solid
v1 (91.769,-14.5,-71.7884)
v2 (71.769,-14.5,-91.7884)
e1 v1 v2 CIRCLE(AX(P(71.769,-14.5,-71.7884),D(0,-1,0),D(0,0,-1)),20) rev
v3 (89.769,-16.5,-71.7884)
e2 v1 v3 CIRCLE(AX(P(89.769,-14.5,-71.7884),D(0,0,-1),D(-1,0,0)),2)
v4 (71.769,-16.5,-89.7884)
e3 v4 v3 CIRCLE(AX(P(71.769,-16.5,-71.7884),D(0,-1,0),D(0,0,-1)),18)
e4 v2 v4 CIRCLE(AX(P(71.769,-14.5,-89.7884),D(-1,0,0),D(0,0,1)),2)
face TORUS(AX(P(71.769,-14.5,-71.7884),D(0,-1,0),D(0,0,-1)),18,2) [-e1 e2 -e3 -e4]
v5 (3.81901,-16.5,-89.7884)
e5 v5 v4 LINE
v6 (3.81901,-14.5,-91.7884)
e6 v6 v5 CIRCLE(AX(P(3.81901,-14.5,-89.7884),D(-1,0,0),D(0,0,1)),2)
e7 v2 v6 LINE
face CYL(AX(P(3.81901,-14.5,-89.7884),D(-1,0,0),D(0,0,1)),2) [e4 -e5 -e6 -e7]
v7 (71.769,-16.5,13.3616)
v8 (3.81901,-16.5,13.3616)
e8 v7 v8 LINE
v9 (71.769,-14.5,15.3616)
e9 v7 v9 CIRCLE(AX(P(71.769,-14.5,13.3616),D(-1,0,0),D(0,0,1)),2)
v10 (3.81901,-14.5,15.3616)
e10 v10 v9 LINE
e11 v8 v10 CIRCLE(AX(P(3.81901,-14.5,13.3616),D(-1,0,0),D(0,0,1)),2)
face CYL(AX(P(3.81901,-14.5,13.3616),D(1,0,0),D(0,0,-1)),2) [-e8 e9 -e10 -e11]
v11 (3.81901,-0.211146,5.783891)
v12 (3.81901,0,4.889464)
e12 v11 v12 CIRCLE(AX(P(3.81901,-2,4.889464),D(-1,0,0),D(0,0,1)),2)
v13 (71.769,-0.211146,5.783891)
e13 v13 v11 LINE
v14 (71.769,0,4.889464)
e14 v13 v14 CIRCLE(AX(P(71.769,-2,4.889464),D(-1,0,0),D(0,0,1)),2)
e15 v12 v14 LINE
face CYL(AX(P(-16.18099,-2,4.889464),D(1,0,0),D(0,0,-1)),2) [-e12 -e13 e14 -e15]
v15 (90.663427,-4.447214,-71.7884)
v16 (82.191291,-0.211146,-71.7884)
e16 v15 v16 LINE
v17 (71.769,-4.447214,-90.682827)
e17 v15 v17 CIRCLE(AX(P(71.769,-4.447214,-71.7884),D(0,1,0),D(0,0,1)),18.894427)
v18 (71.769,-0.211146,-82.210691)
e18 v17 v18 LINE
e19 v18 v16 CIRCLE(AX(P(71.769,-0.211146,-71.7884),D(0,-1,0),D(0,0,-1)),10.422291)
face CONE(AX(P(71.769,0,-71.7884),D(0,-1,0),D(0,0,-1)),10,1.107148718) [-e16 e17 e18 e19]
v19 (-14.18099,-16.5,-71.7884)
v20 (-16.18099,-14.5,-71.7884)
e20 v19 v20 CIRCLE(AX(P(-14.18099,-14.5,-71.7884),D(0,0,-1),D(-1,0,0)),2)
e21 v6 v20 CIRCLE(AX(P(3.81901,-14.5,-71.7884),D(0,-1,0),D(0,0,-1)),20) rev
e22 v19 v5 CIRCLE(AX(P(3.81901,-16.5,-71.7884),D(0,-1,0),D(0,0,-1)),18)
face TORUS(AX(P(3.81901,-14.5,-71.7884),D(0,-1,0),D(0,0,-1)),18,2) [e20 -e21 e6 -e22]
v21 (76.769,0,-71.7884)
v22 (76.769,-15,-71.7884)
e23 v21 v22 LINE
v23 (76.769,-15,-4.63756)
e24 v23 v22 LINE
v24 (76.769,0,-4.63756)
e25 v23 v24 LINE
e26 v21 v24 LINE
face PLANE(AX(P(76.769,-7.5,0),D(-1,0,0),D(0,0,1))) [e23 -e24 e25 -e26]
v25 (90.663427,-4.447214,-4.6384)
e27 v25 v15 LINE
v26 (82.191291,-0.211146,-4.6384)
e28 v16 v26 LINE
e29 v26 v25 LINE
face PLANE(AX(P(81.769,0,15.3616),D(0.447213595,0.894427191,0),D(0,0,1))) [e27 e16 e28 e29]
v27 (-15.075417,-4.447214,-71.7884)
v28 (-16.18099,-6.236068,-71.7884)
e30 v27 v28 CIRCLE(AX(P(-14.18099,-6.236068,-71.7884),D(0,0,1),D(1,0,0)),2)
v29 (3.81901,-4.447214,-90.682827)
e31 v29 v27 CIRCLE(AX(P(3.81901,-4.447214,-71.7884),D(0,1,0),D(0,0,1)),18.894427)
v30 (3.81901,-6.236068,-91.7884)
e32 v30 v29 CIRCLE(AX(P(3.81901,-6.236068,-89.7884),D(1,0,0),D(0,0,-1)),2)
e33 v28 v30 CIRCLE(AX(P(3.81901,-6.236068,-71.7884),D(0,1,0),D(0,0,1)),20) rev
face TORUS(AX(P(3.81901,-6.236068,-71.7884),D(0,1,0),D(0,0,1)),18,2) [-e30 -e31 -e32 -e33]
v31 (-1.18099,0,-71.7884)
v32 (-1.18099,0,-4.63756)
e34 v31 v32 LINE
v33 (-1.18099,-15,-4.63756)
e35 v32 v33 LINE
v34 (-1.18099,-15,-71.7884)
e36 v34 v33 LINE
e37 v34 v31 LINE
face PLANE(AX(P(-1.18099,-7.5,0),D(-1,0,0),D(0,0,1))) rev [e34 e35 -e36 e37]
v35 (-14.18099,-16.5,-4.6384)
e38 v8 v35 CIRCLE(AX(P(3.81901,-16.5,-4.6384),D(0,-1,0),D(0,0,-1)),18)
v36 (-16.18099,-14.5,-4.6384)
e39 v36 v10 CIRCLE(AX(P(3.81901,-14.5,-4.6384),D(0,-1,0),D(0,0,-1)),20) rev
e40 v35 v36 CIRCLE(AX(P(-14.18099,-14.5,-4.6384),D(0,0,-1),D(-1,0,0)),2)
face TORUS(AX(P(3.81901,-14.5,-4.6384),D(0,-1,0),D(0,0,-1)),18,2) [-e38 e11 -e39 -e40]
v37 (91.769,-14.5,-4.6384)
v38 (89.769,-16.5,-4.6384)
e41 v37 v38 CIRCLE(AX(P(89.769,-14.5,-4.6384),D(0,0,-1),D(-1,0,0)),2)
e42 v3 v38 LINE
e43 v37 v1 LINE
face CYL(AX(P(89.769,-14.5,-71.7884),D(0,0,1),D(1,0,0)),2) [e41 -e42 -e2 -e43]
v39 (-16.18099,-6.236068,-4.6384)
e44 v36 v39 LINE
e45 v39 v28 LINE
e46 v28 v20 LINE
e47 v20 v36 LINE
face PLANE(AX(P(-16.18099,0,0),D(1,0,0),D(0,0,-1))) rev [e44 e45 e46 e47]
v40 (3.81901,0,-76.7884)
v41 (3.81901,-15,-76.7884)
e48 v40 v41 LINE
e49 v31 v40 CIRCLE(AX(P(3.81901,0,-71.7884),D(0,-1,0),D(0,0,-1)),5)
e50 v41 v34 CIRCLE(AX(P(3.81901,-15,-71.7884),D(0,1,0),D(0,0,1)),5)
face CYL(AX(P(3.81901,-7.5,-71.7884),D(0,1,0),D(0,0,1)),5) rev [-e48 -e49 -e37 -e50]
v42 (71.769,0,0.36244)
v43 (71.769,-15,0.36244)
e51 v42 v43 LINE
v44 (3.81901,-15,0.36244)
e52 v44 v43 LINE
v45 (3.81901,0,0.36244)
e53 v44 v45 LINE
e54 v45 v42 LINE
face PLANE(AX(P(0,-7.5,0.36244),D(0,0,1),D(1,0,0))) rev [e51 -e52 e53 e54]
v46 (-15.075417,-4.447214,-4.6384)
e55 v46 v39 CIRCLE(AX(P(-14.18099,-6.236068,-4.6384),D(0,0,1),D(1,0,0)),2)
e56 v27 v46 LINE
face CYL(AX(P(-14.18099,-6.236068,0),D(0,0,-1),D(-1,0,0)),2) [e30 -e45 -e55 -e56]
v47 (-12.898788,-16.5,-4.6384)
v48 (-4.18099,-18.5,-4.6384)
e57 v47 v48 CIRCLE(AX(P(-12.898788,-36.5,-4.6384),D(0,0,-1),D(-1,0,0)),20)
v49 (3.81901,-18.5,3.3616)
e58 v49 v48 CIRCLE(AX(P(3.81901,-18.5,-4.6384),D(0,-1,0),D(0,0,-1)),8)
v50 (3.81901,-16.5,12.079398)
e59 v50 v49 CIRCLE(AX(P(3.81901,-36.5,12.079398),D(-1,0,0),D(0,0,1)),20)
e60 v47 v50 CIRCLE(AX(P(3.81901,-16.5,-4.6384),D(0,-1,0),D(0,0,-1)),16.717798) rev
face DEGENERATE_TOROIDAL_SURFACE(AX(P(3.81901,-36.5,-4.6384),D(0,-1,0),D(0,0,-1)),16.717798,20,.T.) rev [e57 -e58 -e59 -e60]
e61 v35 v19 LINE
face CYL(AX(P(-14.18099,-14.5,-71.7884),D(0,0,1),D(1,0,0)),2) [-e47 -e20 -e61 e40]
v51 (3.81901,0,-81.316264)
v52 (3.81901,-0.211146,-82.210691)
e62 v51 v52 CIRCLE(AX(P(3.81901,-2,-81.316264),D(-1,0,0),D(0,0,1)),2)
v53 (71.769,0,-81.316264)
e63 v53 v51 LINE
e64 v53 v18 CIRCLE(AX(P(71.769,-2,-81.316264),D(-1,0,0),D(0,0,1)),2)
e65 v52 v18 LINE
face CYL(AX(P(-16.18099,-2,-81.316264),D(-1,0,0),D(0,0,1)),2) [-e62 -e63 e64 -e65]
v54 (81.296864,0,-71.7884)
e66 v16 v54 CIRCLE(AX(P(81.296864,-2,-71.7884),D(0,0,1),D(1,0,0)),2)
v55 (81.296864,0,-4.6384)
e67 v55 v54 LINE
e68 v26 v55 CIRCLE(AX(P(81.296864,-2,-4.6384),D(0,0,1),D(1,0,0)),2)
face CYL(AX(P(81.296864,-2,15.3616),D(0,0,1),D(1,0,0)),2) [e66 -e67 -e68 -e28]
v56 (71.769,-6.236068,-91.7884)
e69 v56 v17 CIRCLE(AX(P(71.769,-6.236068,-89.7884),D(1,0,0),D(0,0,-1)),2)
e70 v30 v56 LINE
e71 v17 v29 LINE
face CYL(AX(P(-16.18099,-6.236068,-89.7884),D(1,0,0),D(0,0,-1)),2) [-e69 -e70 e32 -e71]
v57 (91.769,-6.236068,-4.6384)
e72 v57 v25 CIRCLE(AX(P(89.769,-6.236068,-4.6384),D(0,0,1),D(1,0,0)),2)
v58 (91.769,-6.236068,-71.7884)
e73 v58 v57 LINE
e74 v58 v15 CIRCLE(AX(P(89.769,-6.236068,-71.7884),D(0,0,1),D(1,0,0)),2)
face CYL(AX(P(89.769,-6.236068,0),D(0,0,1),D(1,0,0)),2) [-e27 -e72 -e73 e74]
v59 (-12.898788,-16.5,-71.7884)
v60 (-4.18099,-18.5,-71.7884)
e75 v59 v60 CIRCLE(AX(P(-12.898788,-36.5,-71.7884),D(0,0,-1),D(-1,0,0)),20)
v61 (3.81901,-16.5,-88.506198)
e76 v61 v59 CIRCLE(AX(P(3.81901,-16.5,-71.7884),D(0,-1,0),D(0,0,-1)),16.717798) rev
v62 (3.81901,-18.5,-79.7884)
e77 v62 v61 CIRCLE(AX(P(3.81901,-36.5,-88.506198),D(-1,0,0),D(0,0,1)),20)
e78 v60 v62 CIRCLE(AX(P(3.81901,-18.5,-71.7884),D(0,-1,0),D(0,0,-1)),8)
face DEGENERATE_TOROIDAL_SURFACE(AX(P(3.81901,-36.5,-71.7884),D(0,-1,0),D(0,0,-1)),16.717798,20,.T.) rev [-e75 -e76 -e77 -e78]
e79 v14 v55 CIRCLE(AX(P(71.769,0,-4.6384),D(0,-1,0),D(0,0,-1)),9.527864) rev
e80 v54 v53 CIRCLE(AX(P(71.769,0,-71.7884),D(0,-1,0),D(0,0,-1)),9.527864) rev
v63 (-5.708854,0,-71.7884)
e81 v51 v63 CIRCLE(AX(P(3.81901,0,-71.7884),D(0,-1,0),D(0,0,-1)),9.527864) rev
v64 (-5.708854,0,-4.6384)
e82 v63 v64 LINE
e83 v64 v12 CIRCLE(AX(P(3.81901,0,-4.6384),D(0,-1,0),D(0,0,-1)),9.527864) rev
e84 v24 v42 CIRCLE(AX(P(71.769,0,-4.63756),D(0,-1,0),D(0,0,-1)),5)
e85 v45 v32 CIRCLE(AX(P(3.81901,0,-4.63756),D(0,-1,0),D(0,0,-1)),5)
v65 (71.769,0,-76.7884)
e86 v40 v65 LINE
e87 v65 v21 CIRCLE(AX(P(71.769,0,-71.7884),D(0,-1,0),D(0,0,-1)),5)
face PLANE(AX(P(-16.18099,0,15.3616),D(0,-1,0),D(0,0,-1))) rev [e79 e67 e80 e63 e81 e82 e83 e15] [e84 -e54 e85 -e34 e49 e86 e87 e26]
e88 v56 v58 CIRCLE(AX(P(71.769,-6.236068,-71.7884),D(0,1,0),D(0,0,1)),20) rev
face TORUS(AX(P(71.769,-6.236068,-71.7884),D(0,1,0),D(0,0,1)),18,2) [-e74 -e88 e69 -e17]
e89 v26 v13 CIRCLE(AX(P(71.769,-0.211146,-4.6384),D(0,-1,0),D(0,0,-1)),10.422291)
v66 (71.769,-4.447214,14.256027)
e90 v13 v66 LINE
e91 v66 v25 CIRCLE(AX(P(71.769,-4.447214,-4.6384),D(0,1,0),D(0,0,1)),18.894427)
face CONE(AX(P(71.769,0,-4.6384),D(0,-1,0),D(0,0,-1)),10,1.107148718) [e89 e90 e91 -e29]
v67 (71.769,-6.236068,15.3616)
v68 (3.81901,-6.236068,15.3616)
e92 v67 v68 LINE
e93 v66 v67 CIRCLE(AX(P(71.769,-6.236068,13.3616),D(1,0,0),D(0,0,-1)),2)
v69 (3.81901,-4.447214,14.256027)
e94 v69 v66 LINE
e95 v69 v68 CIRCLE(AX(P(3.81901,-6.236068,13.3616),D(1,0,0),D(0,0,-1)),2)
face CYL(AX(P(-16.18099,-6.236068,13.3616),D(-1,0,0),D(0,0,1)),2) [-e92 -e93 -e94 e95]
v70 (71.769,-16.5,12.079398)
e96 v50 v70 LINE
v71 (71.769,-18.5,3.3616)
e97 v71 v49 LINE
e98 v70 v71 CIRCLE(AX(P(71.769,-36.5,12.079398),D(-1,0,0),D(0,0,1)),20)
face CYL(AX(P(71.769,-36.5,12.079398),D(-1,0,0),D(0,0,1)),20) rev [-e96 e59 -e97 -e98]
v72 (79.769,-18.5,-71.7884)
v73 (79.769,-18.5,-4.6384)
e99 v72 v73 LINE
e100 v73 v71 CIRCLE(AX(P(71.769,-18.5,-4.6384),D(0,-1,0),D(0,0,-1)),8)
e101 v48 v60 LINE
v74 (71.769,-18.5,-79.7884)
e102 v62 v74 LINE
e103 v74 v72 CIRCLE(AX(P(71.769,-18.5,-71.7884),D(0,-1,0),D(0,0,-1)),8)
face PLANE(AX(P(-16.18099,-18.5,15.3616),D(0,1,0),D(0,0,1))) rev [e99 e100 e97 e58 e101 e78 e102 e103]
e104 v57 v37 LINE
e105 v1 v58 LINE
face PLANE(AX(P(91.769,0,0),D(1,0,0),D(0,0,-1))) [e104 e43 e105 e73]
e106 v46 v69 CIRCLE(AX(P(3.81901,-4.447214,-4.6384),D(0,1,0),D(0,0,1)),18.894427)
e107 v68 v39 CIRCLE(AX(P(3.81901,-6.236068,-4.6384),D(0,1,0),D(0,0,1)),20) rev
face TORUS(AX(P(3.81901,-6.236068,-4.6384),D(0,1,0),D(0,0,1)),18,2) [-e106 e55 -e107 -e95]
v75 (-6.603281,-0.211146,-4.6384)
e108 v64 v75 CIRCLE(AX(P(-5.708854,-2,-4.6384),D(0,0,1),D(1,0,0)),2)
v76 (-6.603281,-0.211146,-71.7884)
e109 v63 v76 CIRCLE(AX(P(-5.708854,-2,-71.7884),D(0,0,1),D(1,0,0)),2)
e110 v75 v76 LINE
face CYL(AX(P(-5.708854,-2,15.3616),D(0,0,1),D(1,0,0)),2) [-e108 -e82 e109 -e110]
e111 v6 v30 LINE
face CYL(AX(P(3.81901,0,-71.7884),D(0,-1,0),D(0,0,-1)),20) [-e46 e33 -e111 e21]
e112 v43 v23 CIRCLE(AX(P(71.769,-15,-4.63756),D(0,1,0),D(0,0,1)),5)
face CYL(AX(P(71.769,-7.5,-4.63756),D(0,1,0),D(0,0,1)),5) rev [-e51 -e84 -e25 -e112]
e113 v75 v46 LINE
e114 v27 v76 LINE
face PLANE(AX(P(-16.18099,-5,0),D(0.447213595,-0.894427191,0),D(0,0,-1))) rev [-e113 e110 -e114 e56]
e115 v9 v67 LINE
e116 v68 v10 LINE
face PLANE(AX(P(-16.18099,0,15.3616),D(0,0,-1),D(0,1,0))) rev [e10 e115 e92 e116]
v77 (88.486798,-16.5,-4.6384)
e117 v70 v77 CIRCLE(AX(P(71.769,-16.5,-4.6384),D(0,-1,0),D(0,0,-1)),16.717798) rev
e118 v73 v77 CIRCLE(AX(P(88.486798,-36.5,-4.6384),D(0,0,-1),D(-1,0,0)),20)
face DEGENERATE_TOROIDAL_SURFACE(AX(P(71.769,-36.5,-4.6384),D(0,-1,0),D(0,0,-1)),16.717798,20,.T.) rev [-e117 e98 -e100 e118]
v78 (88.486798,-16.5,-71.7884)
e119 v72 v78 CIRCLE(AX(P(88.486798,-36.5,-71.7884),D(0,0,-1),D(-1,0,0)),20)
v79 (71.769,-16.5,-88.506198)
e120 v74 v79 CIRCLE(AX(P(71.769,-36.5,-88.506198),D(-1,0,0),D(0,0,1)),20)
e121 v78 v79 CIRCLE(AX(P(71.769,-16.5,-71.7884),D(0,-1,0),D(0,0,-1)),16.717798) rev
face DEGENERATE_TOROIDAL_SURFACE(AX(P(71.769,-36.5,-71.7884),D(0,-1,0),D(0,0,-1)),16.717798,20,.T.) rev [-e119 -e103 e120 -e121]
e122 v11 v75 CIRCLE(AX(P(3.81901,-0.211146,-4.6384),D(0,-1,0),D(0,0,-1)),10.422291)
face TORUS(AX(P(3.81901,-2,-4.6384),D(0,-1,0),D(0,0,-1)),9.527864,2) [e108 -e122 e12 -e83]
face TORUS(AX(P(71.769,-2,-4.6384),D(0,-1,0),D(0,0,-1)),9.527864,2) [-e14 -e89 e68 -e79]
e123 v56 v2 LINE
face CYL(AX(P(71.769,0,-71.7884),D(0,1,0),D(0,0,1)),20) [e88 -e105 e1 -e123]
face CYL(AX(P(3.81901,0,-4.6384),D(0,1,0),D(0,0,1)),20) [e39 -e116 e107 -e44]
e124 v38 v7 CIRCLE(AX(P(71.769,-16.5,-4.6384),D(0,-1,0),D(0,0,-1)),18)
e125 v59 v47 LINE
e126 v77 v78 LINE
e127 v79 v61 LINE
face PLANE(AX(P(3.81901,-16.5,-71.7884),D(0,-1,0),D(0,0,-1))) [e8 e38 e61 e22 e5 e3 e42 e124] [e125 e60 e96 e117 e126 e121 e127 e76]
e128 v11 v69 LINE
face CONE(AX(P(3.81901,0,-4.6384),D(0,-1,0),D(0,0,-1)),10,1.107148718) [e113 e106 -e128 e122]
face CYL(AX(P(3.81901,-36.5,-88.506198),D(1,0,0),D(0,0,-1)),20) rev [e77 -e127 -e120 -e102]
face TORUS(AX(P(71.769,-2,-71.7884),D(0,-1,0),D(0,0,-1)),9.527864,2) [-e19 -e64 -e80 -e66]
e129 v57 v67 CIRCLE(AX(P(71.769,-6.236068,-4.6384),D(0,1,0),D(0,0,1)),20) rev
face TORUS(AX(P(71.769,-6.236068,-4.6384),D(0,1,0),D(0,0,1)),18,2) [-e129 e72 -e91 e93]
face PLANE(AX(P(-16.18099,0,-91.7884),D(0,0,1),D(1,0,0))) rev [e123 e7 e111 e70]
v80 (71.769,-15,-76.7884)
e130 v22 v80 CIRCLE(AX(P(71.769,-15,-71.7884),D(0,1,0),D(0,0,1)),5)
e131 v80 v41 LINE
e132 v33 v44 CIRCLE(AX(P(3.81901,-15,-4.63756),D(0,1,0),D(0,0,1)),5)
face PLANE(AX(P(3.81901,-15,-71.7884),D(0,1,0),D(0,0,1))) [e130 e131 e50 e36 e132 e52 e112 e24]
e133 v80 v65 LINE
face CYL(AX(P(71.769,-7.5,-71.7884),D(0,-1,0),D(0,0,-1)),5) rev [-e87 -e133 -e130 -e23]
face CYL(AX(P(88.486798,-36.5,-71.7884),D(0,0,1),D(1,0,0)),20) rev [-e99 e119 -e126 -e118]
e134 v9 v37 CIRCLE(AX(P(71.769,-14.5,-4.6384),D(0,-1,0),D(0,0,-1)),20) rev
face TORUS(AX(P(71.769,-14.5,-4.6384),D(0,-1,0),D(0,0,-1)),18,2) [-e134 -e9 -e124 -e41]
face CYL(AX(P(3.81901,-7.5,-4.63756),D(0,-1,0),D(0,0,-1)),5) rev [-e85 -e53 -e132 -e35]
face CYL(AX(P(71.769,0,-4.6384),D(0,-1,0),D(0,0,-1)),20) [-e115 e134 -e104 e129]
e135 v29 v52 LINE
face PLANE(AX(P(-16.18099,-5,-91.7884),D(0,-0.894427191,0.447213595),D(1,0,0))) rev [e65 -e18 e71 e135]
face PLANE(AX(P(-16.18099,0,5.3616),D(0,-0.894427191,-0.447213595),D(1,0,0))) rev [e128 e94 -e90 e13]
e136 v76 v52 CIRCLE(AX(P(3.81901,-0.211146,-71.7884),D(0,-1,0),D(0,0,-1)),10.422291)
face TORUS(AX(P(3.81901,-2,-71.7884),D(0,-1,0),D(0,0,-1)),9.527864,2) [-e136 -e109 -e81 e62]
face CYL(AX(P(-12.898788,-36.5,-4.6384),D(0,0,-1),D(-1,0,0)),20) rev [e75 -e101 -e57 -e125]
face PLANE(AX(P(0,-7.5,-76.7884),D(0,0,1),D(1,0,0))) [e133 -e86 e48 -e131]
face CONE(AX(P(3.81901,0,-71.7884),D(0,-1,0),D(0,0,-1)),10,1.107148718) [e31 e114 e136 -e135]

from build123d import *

# Parameters (mm, degrees)
SKETCH5_W           = 107.15
SKETCH5_H           = 18.5
BOSS_EXTRUDE1_DEPTH = 107.94999
SKETCH4_W           = 77.94999
SKETCH4_H           = 77.15084
CUT_EXTRUDE1_DEPTH  = 7.5
FILLET1_R           = 5
FILLET3_R           = 20
CHAMFER1_SIZE       = 10
CHAMFER1_SIZE2      = 5
CUT_EXTRUDE2_DEPTH  = 2
FILLET4_R           = 20
FILLET5_R           = 2
CUT_EXTRUDE3_START  = -7.5
CUT_EXTRUDE3_DEPTH  = 7.5


with BuildPart() as part:
    # Sketch5 → Boss-Extrude1 (new body)
    with BuildSketch(Plane.ZY.offset(-91.769)):
        with Locations((-38.2134, -9.25)):
            Rectangle(SKETCH5_W, SKETCH5_H)
    extrude(amount=BOSS_EXTRUDE1_DEPTH)

    # Sketch4 → Cut-Extrude1 (cut)
    with BuildSketch(Plane(origin=(0, 0, 0), x_dir=(1, 0, 0), z_dir=(0, 1, 0))):
        with Locations((37.794005, 38.21298)):
            Rectangle(SKETCH4_W, SKETCH4_H)
    extrude(amount=-CUT_EXTRUDE1_DEPTH, mode=Mode.SUBTRACT)

    # Fillet1
    fillet1_edges = [part.edges().sort_by_distance(p)[0] for p in [
        (76.769, -3.75, -76.7884),
        (76.769, -3.75, 0.36244),
        (-1.18099, -3.75, 0.36244),
        (-1.18099, -3.75, -76.7884),
    ]]
    fillet(fillet1_edges, radius=FILLET1_R)

    # Fillet3
    fillet3_edges = [part.edges().sort_by_distance(p)[0] for p in [
        (-16.18099, -9.25, -91.7884),
        (-16.18099, -9.25, 15.3616),
        (91.769, -9.25, -91.7884),
        (91.769, -9.25, 15.3616),
    ]]
    fillet(fillet3_edges, radius=FILLET3_R)

    # Chamfer1
    chamfer1_edges = [part.edges().sort_by_distance(p)[0] for p in [
        (37.794005, 0, -91.7884),
        (91.769, 0, -38.2134),
        (-16.18099, 0, -38.2134),
        (37.794005, 0, 15.3616),
        (-10.323125624, 0, -85.930535624),
        (-10.323125624, 0, 9.503735624),
        (85.911135624, 0, 9.503735624),
        (85.911135624, 0, -85.930535624),
    ]]
    chamfer1_side = [part.faces().sort_by_distance(p)[0] for p in [
        (37.794005, 0, 13.840602865),
    ]]
    chamfer(chamfer1_edges, length=CHAMFER1_SIZE, length2=CHAMFER1_SIZE2, reference=chamfer1_side[0])

    # Sketch6 → Cut-Extrude2 (cut)
    with BuildSketch(Plane.XZ.offset(18.5)):
        with BuildLine():
            Line((3.81901, -91.7884), (71.769, -91.7884))
            ThreePointArc((71.769, -91.7884), (85.911135624, -85.930535624), (91.769, -71.7884))
            Line((91.769, -71.7884), (91.769, -4.6384))
            ThreePointArc((91.769, -4.6384), (85.911135624, 9.503735624), (71.769, 15.3616))
            Line((71.769, 15.3616), (3.81901, 15.3616))
            ThreePointArc((3.81901, 15.3616), (-10.323125624, 9.503735624), (-16.18099, -4.6384))
            Line((-16.18099, -4.6384), (-16.18099, -71.7884))
            ThreePointArc((-16.18099, -71.7884), (-10.323125624, -85.930535624), (3.81901, -91.7884))
        make_face()
        with BuildLine():
            Line((3.81901, -79.7884), (71.769, -79.7884))
            ThreePointArc((71.769, -79.7884), (77.425854249, -77.445254249), (79.769, -71.7884))
            Line((79.769, -71.7884), (79.769, -4.6384))
            ThreePointArc((79.769, -4.6384), (77.425854249, 1.018454249), (71.769, 3.3616))
            Line((71.769, 3.3616), (3.81901, 3.3616))
            ThreePointArc((3.81901, 3.3616), (-1.837844249, 1.018454249), (-4.18099, -4.6384))
            Line((-4.18099, -4.6384), (-4.18099, -71.7884))
            ThreePointArc((-4.18099, -71.7884), (-1.837844249, -77.445254249), (3.81901, -79.7884))
        make_face(mode=Mode.SUBTRACT)
    extrude(amount=-CUT_EXTRUDE2_DEPTH, mode=Mode.SUBTRACT)

    # Fillet4
    # the kernel refuses this fillet: 20 mm, written as the material it adds along each edge
    with BuildSketch(Plane(origin=(71.769, -16.5, -4.6384), x_dir=(1, 0, 0), z_dir=(0, 0, -1))) as fillet4_piece_1:
        with BuildLine():
            CenterArc((16.717797887, 20), FILLET4_R, 244.158067237, 25.841932763)
            Line((8, 2), (8, 0))
            Line((8, 0), (16.717797887, 0))
        make_face()
    revolve(axis=Axis((71.769, -16.5, -4.6384), (0, -1, 0)), revolution_arc=90)
    with BuildSketch(Plane(origin=(79.769, -16.5, -71.7884), x_dir=(1, 0, 0), z_dir=(0, 0, 1)), Plane(origin=(-4.18099, -16.5, -4.6384), x_dir=(-1, 0, 0), z_dir=(0, 0, -1))) as fillet4_piece_2:
        with BuildLine():
            CenterArc((8.717797887, -20), FILLET4_R, 90, 25.841932763)
            Line((0, -2), (0, 0))
            Line((0, 0), (8.717797887, 0))
        make_face()
    extrude(amount=67.15)
    with BuildSketch(Plane(origin=(71.769, -16.5, -71.7884), x_dir=(0, 0, -1), z_dir=(-1, 0, 0))) as fillet4_piece_3:
        with BuildLine():
            CenterArc((16.717797887, 20), FILLET4_R, 244.158067237, 25.841932763)
            Line((8, 2), (8, 0))
            Line((8, 0), (16.717797887, 0))
        make_face()
    revolve(axis=Axis((71.769, -16.5, -71.7884), (0, -1, 0)), revolution_arc=90)
    with BuildSketch(Plane(origin=(3.81901, -16.5, -79.7884), x_dir=(0, 0, -1), z_dir=(1, 0, 0)), Plane(origin=(71.769, -16.5, 3.3616), x_dir=(0, 0, 1), z_dir=(-1, 0, 0))) as fillet4_piece_4:
        with BuildLine():
            CenterArc((8.717797887, -20), FILLET4_R, 90, 25.841932763)
            Line((0, -2), (0, 0))
            Line((0, 0), (8.717797887, 0))
        make_face()
    extrude(amount=67.94999)
    with BuildSketch(Plane(origin=(3.81901, -16.5, -71.7884), x_dir=(-1, 0, 0), z_dir=(0, 0, 1))) as fillet4_piece_5:
        with BuildLine():
            CenterArc((16.717797887, 20), FILLET4_R, 244.158067237, 25.841932763)
            Line((8, 2), (8, 0))
            Line((8, 0), (16.717797887, 0))
        make_face()
    revolve(axis=Axis((3.81901, -16.5, -71.7884), (0, -1, 0)), revolution_arc=90)
    with BuildSketch(Plane(origin=(3.81901, -16.5, -4.6384), x_dir=(0, 0, 1), z_dir=(1, 0, 0))) as fillet4_piece_6:
        with BuildLine():
            CenterArc((16.717797887, 20), FILLET4_R, 244.158067237, 25.841932763)
            Line((8, 2), (8, 0))
            Line((8, 0), (16.717797887, 0))
        make_face()
    revolve(axis=Axis((3.81901, -16.5, -4.6384), (0, -1, 0)), revolution_arc=90)

    # Fillet5
    fillet5_edges = [part.edges().sort_by_distance(p)[0] for p in [
        (-10.323125624, -16.5, -85.930535624),
        (-16.18099, -16.5, -38.2134),
        (-10.323125624, -16.5, 9.503735624),
        (37.794005, -16.5, 15.3616),
        (85.911135624, -16.5, 9.503735624),
        (91.769, -16.5, -38.2134),
        (85.911135624, -16.5, -85.930535624),
        (37.794005, -16.5, -91.7884),
        (-6.18099, 0, -38.2134),
        (-3.252057812, 0, -78.859467812),
        (-3.252057812, 0, 2.432667812),
        (37.794005, 0, -81.7884),
        (37.794005, 0, 5.3616),
        (78.840067812, 0, -78.859467812),
        (78.840067812, 0, 2.432667812),
        (81.769, 0, -38.2134),
        (91.769, -5, -38.2134),
        (85.911135624, -5, 9.503735624),
        (85.911135624, -5, -85.930535624),
        (37.794005, -5, 15.3616),
        (37.794005, -5, -91.7884),
        (-10.323125624, -5, 9.503735624),
        (-10.323125624, -5, -85.930535624),
        (-16.18099, -5, -38.2134),
    ]]
    fillet(fillet5_edges, radius=FILLET5_R)

    # Sketch8 → Cut-Extrude3 (cut)
    with BuildSketch(Plane(origin=(0, -7.5, 0), x_dir=(1, 0, 0), z_dir=(0, 1, 0)).offset(CUT_EXTRUDE3_START)):
        with BuildLine():
            Line((-1.18099, 71.7884), (-1.18099, 4.63756))
            ThreePointArc((-1.18099, 4.63756), (0.283476094, 1.102026094), (3.81901, -0.36244))
            Line((3.81901, -0.36244), (71.769, -0.36244))
            ThreePointArc((71.769, -0.36244), (75.304533906, 1.102026094), (76.769, 4.63756))
            Line((76.769, 4.63756), (76.769, 71.7884))
            ThreePointArc((76.769, 71.7884), (75.304533906, 75.323933906), (71.769, 76.7884))
            Line((71.769, 76.7884), (3.81901, 76.7884))
            ThreePointArc((3.81901, 76.7884), (0.283476094, 75.323933906), (-1.18099, 71.7884))
        make_face()
    extrude(amount=CUT_EXTRUDE3_DEPTH, mode=Mode.SUBTRACT)


solid = part.part
